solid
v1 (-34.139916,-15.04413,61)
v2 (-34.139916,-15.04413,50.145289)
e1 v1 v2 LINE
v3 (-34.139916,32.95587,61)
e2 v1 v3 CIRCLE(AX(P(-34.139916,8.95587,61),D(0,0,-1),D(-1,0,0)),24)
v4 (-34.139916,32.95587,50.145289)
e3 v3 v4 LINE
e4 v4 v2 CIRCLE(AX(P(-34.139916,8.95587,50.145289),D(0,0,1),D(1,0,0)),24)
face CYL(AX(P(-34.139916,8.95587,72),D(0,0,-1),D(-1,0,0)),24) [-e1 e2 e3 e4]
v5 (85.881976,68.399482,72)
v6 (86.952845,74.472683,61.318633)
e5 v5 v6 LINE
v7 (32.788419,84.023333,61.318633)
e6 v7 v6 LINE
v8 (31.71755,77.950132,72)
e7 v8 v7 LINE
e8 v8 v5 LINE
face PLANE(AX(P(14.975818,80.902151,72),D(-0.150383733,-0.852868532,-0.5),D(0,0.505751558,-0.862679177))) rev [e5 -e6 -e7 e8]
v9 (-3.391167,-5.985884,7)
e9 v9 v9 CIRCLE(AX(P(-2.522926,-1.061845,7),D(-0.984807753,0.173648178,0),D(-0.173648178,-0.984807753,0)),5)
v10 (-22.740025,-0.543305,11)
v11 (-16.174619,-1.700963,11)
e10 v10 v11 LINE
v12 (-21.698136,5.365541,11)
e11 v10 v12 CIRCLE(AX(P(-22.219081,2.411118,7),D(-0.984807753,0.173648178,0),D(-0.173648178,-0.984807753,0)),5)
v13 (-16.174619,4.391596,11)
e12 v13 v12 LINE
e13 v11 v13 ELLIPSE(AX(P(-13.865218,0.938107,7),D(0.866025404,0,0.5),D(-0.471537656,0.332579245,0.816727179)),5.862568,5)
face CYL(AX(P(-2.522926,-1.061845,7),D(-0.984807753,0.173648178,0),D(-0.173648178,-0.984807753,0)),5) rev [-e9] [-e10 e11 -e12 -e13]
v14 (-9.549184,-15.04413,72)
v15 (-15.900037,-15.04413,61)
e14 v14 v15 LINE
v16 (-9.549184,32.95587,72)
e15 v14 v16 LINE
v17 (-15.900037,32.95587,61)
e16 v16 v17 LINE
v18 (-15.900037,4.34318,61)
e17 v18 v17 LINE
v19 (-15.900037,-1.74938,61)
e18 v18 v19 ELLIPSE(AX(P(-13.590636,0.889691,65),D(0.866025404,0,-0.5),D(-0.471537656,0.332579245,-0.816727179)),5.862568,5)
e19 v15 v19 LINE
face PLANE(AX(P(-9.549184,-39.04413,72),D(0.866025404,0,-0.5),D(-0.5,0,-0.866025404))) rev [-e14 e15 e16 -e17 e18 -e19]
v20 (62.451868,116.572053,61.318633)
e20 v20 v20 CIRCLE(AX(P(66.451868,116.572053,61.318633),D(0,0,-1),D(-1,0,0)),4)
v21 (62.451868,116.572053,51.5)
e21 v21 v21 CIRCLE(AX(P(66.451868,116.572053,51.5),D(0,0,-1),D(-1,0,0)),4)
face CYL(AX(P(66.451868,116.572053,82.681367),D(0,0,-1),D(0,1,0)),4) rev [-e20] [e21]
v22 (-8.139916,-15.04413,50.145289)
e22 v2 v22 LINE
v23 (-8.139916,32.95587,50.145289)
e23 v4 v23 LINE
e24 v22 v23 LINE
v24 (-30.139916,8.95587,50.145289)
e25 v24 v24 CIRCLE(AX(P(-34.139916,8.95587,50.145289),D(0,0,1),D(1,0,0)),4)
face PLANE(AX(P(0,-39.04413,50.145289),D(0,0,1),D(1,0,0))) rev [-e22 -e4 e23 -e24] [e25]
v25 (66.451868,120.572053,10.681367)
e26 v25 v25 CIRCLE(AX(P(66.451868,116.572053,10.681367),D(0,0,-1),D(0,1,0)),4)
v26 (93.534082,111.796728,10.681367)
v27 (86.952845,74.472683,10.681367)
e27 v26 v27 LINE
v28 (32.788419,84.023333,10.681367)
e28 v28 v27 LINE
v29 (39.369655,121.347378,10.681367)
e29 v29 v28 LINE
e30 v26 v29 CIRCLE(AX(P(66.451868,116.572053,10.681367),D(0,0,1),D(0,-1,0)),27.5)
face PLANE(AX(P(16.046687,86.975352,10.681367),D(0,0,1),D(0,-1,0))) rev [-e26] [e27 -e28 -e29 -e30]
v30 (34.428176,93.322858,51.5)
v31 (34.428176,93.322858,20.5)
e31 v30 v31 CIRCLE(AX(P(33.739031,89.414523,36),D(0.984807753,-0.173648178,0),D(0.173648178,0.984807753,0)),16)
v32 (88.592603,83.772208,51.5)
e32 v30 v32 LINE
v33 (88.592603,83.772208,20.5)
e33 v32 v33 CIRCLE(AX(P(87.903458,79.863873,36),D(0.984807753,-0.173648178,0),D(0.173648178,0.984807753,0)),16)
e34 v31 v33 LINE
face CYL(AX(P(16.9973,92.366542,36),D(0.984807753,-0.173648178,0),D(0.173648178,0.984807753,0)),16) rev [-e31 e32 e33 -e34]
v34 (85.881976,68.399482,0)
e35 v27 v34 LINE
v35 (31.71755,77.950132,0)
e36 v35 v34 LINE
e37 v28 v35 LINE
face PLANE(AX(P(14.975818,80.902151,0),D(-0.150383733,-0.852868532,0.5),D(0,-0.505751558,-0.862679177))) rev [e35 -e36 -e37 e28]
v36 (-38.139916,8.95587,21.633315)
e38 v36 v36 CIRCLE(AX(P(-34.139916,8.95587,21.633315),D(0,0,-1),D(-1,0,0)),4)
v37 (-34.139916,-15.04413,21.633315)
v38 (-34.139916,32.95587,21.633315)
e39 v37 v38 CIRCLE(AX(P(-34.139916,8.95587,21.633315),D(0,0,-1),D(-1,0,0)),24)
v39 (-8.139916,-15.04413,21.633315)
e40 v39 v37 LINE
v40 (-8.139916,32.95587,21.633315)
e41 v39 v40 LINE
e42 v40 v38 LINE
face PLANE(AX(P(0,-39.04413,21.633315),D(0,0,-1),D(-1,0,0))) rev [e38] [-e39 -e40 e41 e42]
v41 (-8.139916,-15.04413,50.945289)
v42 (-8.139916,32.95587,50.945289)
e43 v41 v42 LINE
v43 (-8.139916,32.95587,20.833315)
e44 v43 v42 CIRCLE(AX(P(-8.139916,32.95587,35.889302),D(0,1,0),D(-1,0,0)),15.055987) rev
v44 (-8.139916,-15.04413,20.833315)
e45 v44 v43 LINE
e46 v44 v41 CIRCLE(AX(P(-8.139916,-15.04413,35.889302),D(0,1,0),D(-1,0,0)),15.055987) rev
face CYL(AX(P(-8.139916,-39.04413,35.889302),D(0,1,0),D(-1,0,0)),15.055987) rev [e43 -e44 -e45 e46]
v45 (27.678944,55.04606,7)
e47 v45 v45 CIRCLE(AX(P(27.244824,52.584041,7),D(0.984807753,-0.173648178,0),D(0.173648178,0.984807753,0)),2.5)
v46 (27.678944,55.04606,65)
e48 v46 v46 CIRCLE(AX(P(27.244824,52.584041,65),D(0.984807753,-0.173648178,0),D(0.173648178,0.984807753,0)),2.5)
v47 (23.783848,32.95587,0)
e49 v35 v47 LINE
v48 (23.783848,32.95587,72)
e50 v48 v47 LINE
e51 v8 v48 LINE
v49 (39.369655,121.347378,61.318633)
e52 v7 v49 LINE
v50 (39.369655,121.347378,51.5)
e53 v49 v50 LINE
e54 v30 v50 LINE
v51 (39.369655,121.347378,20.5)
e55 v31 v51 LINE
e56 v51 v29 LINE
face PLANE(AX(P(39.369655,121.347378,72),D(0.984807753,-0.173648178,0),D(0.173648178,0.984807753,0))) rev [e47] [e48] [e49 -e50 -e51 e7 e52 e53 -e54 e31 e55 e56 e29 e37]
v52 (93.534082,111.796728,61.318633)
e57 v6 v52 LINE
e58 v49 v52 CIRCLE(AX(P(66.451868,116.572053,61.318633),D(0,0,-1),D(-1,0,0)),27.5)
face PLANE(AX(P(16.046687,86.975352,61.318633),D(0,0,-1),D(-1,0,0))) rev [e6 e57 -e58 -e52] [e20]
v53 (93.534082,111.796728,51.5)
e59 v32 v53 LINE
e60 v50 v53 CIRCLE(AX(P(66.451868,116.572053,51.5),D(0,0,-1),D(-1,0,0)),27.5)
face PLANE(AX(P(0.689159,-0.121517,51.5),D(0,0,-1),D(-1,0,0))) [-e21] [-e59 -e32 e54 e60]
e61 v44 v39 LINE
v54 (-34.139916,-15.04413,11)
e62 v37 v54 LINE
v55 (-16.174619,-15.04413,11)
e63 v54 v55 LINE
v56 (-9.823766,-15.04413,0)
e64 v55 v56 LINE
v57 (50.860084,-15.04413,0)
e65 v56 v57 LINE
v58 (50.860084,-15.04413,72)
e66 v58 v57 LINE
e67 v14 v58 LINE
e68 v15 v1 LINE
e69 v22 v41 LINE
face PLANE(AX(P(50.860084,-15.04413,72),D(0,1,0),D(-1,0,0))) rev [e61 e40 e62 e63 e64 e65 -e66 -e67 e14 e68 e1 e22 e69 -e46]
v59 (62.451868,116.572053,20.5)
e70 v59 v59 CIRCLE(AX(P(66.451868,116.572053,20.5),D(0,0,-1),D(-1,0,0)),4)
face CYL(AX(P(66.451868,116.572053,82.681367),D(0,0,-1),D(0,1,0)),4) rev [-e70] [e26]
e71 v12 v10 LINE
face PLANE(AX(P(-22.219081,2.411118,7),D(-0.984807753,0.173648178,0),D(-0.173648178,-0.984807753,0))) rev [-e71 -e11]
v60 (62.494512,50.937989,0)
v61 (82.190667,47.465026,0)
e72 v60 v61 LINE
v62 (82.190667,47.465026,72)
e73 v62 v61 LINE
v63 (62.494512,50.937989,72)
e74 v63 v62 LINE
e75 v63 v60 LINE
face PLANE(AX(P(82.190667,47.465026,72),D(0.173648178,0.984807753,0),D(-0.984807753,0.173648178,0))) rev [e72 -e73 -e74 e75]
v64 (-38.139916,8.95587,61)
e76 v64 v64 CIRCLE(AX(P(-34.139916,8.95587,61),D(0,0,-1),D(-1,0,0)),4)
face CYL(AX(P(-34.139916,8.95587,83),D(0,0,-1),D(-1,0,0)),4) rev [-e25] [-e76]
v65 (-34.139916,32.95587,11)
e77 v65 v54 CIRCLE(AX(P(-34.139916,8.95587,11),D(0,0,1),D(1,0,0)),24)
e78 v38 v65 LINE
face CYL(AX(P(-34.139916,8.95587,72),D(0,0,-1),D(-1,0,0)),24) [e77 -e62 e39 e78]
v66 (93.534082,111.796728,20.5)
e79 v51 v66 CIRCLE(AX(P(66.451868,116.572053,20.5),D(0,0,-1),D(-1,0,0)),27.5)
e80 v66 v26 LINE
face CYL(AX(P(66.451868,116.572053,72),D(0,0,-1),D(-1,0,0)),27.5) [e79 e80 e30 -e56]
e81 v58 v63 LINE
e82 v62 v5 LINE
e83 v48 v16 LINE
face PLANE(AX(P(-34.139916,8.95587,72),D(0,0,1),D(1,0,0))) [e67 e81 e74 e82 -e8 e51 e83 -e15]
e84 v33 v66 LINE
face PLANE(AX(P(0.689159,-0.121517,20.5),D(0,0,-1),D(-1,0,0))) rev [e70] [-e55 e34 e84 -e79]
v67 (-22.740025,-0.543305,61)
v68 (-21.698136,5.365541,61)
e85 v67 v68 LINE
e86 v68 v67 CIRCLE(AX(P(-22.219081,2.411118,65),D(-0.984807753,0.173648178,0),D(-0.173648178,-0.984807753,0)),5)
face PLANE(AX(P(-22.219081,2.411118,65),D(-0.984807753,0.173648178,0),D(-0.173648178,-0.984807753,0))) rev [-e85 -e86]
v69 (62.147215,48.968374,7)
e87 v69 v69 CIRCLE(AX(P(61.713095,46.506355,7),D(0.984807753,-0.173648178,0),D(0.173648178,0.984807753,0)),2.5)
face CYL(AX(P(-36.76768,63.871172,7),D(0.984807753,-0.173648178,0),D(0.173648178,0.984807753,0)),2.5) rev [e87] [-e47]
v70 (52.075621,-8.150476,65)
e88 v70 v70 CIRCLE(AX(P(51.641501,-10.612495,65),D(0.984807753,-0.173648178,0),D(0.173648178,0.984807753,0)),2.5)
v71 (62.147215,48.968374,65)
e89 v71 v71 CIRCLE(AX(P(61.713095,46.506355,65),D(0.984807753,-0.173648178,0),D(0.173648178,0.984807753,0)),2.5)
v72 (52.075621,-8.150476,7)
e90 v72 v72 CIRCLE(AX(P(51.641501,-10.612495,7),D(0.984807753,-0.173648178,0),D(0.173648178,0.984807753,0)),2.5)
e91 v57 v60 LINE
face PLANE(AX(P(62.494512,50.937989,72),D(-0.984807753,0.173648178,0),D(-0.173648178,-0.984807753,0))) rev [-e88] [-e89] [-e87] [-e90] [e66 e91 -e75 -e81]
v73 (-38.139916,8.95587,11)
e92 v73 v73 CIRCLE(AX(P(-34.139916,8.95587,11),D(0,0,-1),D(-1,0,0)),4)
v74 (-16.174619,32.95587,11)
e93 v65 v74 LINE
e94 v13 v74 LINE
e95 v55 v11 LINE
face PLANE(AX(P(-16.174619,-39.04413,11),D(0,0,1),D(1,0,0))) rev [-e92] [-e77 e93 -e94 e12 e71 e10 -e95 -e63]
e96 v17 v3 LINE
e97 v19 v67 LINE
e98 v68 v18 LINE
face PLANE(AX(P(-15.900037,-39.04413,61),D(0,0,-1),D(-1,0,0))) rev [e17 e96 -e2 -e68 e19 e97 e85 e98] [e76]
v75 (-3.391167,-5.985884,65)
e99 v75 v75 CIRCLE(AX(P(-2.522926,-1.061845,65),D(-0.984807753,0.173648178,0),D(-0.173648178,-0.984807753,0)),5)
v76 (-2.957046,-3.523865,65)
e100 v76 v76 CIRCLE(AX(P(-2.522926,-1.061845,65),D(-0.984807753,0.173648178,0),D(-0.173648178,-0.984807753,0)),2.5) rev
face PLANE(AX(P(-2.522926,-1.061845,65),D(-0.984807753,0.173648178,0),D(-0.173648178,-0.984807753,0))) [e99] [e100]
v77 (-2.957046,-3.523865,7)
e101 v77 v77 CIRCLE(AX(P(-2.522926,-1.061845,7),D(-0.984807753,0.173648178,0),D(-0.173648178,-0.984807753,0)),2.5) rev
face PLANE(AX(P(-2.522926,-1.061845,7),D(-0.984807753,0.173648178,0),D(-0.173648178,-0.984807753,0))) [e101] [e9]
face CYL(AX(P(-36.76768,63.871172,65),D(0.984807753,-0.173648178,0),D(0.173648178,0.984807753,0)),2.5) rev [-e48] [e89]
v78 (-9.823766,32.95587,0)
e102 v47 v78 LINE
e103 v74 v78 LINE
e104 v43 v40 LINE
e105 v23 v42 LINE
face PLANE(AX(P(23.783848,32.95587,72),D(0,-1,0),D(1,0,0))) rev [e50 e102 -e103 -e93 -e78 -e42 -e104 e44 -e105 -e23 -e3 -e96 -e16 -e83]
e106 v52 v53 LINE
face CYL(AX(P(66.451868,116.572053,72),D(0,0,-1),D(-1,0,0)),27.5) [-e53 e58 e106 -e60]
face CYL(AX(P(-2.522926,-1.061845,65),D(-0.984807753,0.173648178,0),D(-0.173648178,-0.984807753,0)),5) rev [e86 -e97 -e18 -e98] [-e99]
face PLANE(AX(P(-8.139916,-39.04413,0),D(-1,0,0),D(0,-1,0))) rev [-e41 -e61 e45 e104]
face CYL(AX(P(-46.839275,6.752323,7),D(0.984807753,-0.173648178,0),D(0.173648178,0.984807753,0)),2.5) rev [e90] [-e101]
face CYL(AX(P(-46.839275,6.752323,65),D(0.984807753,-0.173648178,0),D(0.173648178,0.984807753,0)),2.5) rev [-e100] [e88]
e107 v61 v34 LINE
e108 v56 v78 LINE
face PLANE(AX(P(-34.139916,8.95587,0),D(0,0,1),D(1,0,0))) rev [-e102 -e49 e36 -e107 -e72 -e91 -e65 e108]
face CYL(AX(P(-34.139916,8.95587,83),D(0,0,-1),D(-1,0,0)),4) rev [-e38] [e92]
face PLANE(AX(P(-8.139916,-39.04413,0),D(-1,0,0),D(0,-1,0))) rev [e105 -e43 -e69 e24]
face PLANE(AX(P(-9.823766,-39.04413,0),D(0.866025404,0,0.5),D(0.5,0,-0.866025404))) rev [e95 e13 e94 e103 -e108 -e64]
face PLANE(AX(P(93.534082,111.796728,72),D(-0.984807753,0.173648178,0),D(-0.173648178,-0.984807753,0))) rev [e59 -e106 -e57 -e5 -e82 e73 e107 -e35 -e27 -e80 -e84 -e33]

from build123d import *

# Parameters (mm, degrees)
BOSS_EXTRUDE1_DEPTH = 72
CUT_EXTRUDE1_DEPTH  = 72
SKETCH4_W           = 26
SKETCH4_H           = 28.511973983
SKETCH4_W_2         = 24
CUT_EXTRUDE2_DEPTH  = 72
CUT_EXTRUDE3_DEPTH  = 72
CUT_EXTRUDE4_DEPTH  = 72
SKETCH10_R          = 4
CUT_EXTRUDE5_DEPTH  = 72
SKETCH9_R           = 4
CUT_EXTRUDE6_DEPTH  = 72
SKETCH11_R          = 2.5
CUT_EXTRUDE7_DEPTH  = 100
SKETCH15_R          = 5
CUT_EXTRUDE9_DEPTH  = 20


# Read off the part's stored shape, not the designer's step: Boss-Extrude1
with BuildPart() as part:
    # Boss-Extrude1 outline → Boss-Extrude1 (new body)
    with BuildSketch(Plane.XY):
        with BuildLine():
            Line((62.494511824, 50.937989443), (82.190666884, 47.46502589))
            Line((82.190666884, 47.46502589), (93.534081641, 111.796727777))
            ThreePointArc((93.534081641, 111.796727777), (71.22719332, 143.654265871), (39.369655226, 121.347377549))
            Line((39.369655226, 121.347377549), (23.783847578, 32.955869992))
            Line((23.783847578, 32.955869992), (-34.13991608, 32.955869992))
            ThreePointArc((-34.13991608, 32.955869992), (-58.13991608, 8.955869992), (-34.13991608, -15.044130008))
            Line((-34.13991608, -15.044130008), (50.86008392, -15.044130008))
            Line((50.86008392, -15.044130008), (62.494511824, 50.937989443))
        make_face()
    extrude(amount=BOSS_EXTRUDE1_DEPTH)

    # Sketch3 → Cut-Extrude1 (cut)
    with BuildSketch(Plane(origin=(0, 32.955869992, 0), x_dir=(1, 0, 0), z_dir=(0, 1, 0))):
        Polygon((-9.823766264, 0), (-16.174619225, -11), (-58.13991608, -11), (-58.13991608, 0), align=None)
        Polygon((-9.54918364, -72), (-15.900036601, -61), (-58.13991608, -61), (-58.13991608, -72), align=None)
    extrude(amount=-CUT_EXTRUDE1_DEPTH, mode=Mode.SUBTRACT)

    # Sketch4 → Cut-Extrude2 (cut)
    with BuildSketch(Plane(origin=(0, 32.955869992, 0), x_dir=(1, 0, 0), z_dir=(0, 1, 0))):
        with Locations((-21.13991608, -35.889301659)):
            Rectangle(SKETCH4_W, SKETCH4_H)
        with Locations((-46.13991608, -35.889301659)):
            Rectangle(SKETCH4_W_2, SKETCH4_H)
        with BuildLine():
            ThreePointArc((-8.13991608, -20.833314667), (6.916070911, -35.889301658), (-8.13991608, -50.94528865))
            Line((-8.13991608, -50.94528865), (-8.13991608, -20.833314667))
        make_face()
    extrude(amount=-CUT_EXTRUDE2_DEPTH, mode=Mode.SUBTRACT)

    # Sketch5 → Cut-Extrude3 (cut)
    with BuildSketch(Plane(origin=(71.595317547, -12.624186176, 0), x_dir=(0, 0, -1), z_dir=(0.9848077530122087, -0.173648177666927, 0))):
        Polygon((-72, 82.273588595), (-61.318633323, 88.440478521), (-61.318633323, 153.840307103), (-72, 153.840307103), align=None)
        Polygon((0, 82.273588595), (-10.681366677, 88.440478521), (-10.681366677, 153.840307103), (0, 153.840307103), align=None)
    extrude(amount=-CUT_EXTRUDE3_DEPTH, mode=Mode.SUBTRACT)

    # Sketch7 → Cut-Extrude4 (cut)
    with BuildSketch(Plane(origin=(71.595317547, -12.624186176, 0), x_dir=(0, 0, -1), z_dir=(0.9848077530122087, -0.173648177666927, 0))):
        with BuildLine():
            Line((-51.5, 97.883463974), (-51.5, 153.840307103))
            Line((-51.5, 153.840307103), (-20.5, 153.840307103))
            Line((-20.5, 153.840307103), (-20.5, 97.883463974))
            ThreePointArc((-20.5, 97.883463974), (-36, 77.914837007), (-51.5, 97.883463974))
        make_face()
    extrude(amount=-CUT_EXTRUDE4_DEPTH, mode=Mode.SUBTRACT)

    # Sketch10 → Cut-Extrude5 (cut)
    with BuildSketch(Plane(origin=(0, 0, 10.681366677), x_dir=(-1, 0, 0), z_dir=(0, 0, -1))):
        with Locations((-66.451868434, 116.572052663)):
            Circle(SKETCH10_R)
    extrude(amount=-CUT_EXTRUDE5_DEPTH, mode=Mode.SUBTRACT)

    # Sketch9 → Cut-Extrude6 (cut)
    with BuildSketch(Plane(origin=(0, 0, 11), x_dir=(-1, 0, 0), z_dir=(0, 0, -1))):
        with Locations((34.13991608, 8.955869992)):
            Circle(SKETCH9_R)
    extrude(amount=-CUT_EXTRUDE6_DEPTH, mode=Mode.SUBTRACT)

    # Sketch11 → Cut-Extrude7 (cut)
    with BuildSketch(Plane(origin=(51.899162487, -9.151222623, 0), x_dir=(0, 0, -1), z_dir=(0.9848077530122088, -0.17364817766692606, 0))):
        with Locations(Location((-7, -1.483814981, 0), (0, 0, 90))):
            Circle(SKETCH11_R)
        with Locations(Location((-65, -1.483814981, 0), (0, 0, 90))):
            Circle(SKETCH11_R)
        with Locations(Location((-7, 56.516185019, 0), (0, 0, 90))):
            Circle(SKETCH11_R)
        with Locations(Location((-65, 56.516185019, 0), (0, 0, 90))):
            Circle(SKETCH11_R)
    extrude(amount=-CUT_EXTRUDE7_DEPTH, mode=Mode.SUBTRACT)

    # Sketch15 → Cut-Extrude9 (cut)
    with BuildSketch(Plane(origin=(-21.961418989, 3.872390702, 0), x_dir=(0, 0, 1), z_dir=(-0.9848077530122088, 0.17364817766692614, 0))):
        with Locations(Location((7, -1.483814981, 0), (0, 0, 270))):
            Circle(SKETCH15_R)
        with Locations(Location((65, -1.483814981, 0), (0, 0, 270))):
            Circle(SKETCH15_R)
    extrude(amount=-CUT_EXTRUDE9_DEPTH, mode=Mode.SUBTRACT)


solid = part.part
